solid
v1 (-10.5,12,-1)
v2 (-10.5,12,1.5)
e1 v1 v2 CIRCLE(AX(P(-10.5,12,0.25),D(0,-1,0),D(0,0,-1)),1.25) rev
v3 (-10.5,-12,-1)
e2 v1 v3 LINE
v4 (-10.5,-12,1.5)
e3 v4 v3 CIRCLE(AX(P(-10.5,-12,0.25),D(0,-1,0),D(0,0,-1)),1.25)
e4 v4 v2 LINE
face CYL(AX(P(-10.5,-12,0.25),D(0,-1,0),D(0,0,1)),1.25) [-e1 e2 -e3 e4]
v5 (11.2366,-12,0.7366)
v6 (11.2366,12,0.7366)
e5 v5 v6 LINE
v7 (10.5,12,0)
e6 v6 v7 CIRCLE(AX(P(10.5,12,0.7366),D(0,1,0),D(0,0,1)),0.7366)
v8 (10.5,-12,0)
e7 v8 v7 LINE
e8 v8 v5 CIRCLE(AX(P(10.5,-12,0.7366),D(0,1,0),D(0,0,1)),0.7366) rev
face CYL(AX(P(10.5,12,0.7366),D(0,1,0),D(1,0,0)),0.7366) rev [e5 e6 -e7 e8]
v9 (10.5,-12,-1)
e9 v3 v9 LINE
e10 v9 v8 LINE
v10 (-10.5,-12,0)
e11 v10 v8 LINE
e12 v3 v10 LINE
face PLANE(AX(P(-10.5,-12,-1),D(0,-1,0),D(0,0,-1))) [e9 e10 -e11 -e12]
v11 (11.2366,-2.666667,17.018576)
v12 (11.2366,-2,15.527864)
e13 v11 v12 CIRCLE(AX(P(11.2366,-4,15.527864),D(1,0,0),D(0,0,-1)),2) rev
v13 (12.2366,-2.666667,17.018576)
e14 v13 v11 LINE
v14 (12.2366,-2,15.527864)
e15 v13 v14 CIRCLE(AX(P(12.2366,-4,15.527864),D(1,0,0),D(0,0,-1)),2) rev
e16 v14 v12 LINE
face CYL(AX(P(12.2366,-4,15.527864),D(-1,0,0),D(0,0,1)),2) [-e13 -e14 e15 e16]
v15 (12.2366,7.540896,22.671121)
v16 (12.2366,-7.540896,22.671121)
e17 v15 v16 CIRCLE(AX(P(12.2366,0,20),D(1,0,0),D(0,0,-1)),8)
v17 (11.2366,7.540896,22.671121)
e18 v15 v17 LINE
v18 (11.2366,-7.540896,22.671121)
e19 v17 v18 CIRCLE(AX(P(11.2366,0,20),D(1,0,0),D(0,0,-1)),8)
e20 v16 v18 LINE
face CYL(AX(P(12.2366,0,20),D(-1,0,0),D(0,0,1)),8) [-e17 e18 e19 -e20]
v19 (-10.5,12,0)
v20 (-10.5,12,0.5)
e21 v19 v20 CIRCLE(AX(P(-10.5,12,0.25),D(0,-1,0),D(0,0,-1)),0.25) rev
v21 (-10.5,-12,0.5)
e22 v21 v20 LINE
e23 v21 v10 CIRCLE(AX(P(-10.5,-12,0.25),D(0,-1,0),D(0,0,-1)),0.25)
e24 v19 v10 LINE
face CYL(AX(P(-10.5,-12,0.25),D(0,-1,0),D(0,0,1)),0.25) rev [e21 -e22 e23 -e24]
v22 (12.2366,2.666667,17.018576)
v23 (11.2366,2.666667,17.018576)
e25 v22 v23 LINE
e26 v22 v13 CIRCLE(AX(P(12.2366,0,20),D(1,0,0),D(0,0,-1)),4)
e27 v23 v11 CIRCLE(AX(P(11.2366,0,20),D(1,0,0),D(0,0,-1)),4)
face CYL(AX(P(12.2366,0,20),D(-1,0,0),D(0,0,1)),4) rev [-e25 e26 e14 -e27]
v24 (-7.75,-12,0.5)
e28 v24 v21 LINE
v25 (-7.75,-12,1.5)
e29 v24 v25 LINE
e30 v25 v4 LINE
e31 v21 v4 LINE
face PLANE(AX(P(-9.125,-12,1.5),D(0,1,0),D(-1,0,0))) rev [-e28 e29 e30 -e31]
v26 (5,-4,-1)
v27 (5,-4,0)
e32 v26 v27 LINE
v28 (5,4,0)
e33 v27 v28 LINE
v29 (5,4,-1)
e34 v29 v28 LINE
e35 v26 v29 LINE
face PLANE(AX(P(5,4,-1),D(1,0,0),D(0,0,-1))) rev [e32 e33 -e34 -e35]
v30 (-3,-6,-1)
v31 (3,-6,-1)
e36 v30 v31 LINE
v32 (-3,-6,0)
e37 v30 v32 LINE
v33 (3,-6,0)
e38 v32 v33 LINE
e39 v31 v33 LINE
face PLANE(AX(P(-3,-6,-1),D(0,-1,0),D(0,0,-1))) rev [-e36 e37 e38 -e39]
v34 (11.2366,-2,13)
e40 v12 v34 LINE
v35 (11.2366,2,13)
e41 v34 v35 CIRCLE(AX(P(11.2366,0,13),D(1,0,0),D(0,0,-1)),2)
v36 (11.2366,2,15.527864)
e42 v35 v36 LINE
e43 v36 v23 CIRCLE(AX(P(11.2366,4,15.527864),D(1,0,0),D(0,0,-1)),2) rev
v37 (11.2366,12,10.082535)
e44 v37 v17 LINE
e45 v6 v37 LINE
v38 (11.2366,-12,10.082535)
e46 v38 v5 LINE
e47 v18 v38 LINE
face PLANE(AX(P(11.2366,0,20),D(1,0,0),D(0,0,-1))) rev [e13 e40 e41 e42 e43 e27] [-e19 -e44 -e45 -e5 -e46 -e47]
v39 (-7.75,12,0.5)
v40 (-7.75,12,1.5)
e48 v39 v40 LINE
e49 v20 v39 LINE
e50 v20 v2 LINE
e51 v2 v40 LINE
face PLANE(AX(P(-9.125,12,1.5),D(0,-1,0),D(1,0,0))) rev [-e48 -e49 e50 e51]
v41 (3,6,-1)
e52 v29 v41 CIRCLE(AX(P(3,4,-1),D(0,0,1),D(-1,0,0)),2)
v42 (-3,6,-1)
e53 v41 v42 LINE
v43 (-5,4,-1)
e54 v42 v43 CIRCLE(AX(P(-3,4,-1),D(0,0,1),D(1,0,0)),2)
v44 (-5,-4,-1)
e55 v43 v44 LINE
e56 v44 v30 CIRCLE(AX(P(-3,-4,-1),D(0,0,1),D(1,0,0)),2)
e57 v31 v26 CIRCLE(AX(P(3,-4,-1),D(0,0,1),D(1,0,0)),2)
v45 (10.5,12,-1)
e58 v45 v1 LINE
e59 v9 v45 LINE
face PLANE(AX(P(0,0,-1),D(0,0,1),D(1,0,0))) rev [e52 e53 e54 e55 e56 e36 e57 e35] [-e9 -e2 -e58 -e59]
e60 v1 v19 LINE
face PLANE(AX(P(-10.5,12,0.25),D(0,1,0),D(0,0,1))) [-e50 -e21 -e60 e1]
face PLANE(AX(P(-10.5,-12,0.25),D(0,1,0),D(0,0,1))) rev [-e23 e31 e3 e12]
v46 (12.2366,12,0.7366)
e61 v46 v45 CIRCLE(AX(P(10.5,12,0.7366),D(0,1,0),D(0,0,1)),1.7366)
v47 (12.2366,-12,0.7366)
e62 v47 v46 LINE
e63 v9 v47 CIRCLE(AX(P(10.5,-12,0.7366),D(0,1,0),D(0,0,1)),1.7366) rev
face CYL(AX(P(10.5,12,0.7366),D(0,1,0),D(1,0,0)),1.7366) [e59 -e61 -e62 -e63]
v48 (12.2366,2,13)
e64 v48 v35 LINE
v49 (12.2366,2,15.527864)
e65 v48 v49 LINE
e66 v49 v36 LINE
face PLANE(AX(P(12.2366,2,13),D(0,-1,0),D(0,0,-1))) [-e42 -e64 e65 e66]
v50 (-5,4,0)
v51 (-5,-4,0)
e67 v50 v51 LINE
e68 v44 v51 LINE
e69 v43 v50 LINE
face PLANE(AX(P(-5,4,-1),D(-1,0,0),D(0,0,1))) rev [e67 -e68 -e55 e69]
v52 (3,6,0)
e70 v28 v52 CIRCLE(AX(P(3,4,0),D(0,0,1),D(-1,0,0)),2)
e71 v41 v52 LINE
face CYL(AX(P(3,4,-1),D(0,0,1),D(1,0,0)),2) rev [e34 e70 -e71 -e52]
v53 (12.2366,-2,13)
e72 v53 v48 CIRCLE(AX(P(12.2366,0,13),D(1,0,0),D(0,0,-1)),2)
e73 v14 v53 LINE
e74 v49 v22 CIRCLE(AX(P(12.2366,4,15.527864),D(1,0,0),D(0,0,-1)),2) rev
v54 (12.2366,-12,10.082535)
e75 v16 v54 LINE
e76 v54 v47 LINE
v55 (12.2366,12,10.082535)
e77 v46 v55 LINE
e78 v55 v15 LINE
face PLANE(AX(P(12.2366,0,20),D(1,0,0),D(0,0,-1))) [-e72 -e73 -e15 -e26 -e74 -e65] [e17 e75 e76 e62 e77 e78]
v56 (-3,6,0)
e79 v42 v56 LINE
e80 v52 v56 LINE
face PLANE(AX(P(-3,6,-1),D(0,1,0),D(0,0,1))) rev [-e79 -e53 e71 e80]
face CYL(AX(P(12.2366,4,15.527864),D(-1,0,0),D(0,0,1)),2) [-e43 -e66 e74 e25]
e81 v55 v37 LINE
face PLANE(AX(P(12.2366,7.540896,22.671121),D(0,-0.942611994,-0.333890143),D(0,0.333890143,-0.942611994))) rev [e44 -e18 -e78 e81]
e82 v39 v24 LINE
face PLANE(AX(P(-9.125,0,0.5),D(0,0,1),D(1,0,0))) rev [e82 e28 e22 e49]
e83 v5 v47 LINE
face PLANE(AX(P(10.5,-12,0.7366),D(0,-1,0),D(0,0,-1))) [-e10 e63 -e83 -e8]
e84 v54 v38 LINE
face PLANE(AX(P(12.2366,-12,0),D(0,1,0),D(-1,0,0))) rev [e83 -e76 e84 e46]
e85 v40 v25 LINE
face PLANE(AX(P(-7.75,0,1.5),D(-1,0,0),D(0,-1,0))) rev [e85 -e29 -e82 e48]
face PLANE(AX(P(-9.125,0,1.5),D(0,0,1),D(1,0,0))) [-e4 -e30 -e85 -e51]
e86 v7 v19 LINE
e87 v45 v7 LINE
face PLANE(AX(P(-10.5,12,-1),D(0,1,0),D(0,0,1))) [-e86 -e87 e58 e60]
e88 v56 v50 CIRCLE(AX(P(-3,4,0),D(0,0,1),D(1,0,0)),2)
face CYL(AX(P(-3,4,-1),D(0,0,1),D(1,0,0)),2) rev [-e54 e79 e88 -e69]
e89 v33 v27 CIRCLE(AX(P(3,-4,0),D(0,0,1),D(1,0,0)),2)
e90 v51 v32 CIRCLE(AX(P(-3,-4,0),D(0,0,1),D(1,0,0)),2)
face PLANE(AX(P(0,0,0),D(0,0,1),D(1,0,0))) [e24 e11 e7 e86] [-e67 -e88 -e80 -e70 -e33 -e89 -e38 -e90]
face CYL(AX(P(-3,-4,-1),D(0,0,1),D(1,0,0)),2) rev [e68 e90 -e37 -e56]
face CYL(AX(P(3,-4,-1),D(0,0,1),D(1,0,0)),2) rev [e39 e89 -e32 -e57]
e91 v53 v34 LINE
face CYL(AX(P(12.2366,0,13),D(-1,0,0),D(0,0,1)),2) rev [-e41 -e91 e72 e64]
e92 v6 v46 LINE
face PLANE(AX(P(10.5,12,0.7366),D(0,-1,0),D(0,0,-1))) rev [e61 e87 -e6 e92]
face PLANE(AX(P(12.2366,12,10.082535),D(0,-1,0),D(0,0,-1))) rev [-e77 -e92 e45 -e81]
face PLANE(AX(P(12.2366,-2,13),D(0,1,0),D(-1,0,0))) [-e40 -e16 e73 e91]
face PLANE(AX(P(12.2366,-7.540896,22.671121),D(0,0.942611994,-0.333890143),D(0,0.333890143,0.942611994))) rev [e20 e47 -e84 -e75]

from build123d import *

# Parameters (mm, degrees)
SKETCH1_W               = 21
SKETCH1_H               = 24
BASE_FLANGE1_DEPTH      = 1
EDGE_FLANGE1_DEPTH      = 24
EDGE_FLANGE1_START      = 1
EDGE_FLANGE1_FLAT_DEPTH = 1
HEM1_START              = -12
HEM1_DEPTH              = 24


# Read off the part's stored shape, not the designer's step: Hem1
# Sheet-metal steps are written as plain solids
with BuildPart() as part:
    # Sketch1 → Base-Flange1 (new body)
    with BuildSketch(Plane.XY):
        Rectangle(SKETCH1_W, SKETCH1_H)
        with BuildLine():
            Line((-3, 6), (3, 6))
            ThreePointArc((3, 6), (4.414213562, 5.414213562), (5, 4))
            Line((5, 4), (5, -4))
            ThreePointArc((5, -4), (4.414213562, -5.414213562), (3, -6))
            Line((3, -6), (-3, -6))
            ThreePointArc((-3, -6), (-4.414213562, -5.414213562), (-5, -4))
            Line((-5, -4), (-5, 4))
            ThreePointArc((-5, 4), (-4.414213562, 5.414213562), (-3, 6))
        make_face(mode=Mode.SUBTRACT)
    extrude(amount=-BASE_FLANGE1_DEPTH)

    # Edge-Flange1 bend section (across the edge) → Edge-Flange1 (add)
    with BuildSketch(Plane(origin=(11.2366, -12, 0), x_dir=(-1, 0, 0), z_dir=(0, 1, 0))):
        with BuildLine():
            Line((-1, 0.7366), (0, 0.7366))
            ThreePointArc((0, 0.7366), (0.215745145, 0.215745145), (0.7366, 0))
            Line((0.7366, 0), (0.7366, -1))
            ThreePointArc((0.7366, -1), (-0.491361636, -0.491361636), (-1, 0.7366))
        make_face()
    extrude(amount=EDGE_FLANGE1_DEPTH)

    # Edge-Flange1 profile (on flange) → Edge-Flange1 flat (add)
    with BuildSketch(Plane.YZ.offset(11.2366).offset(EDGE_FLANGE1_START)):
        with BuildLine():
            ThreePointArc((7.540895956, 22.671121147), (0, 28), (-7.540895956, 22.671121147))
            Line((-7.540895956, 22.671121147), (-12, 10.082534632))
            Line((-12, 10.082534632), (-12, 0.7366))
            Line((-12, 0.7366), (12, 0.7366))
            Line((12, 0.7366), (12, 10.082534632))
            Line((12, 10.082534632), (7.540895956, 22.671121147))
        make_face()
        with BuildLine():
            ThreePointArc((2, 13), (0, 11), (-2, 13))
            Line((-2, 13), (-2, 15.527864045))
            ThreePointArc((-2, 15.527864045), (-2.174258142, 16.344360626), (-2.666666667, 17.01857603))
            ThreePointArc((-2.666666667, 17.01857603), (0, 24), (2.666666667, 17.01857603))
            ThreePointArc((2.666666667, 17.01857603), (2.174258142, 16.344360626), (2, 15.527864045))
            Line((2, 15.527864045), (2, 13))
        make_face(mode=Mode.SUBTRACT)
    extrude(amount=-EDGE_FLANGE1_FLAT_DEPTH)

    # Hem1 outline → Hem1 (add)
    with BuildSketch(Plane(origin=(0, 0, 0), x_dir=(1, 0, 0), z_dir=(0, 1, 0)).offset(HEM1_START)):
        with BuildLine():
            Line((-7.75, -1.5), (-7.75, -0.5))
            Line((-7.75, -0.5), (-10.5, -0.5))
            ThreePointArc((-10.5, -0.5), (-10.75, -0.25), (-10.5, 0))
            Line((-10.5, 0), (-10.5, 1))
            ThreePointArc((-10.5, 1), (-11.75, -0.25), (-10.5, -1.5))
            Line((-10.5, -1.5), (-7.75, -1.5))
        make_face()
    extrude(amount=HEM1_DEPTH)


solid = part.part
